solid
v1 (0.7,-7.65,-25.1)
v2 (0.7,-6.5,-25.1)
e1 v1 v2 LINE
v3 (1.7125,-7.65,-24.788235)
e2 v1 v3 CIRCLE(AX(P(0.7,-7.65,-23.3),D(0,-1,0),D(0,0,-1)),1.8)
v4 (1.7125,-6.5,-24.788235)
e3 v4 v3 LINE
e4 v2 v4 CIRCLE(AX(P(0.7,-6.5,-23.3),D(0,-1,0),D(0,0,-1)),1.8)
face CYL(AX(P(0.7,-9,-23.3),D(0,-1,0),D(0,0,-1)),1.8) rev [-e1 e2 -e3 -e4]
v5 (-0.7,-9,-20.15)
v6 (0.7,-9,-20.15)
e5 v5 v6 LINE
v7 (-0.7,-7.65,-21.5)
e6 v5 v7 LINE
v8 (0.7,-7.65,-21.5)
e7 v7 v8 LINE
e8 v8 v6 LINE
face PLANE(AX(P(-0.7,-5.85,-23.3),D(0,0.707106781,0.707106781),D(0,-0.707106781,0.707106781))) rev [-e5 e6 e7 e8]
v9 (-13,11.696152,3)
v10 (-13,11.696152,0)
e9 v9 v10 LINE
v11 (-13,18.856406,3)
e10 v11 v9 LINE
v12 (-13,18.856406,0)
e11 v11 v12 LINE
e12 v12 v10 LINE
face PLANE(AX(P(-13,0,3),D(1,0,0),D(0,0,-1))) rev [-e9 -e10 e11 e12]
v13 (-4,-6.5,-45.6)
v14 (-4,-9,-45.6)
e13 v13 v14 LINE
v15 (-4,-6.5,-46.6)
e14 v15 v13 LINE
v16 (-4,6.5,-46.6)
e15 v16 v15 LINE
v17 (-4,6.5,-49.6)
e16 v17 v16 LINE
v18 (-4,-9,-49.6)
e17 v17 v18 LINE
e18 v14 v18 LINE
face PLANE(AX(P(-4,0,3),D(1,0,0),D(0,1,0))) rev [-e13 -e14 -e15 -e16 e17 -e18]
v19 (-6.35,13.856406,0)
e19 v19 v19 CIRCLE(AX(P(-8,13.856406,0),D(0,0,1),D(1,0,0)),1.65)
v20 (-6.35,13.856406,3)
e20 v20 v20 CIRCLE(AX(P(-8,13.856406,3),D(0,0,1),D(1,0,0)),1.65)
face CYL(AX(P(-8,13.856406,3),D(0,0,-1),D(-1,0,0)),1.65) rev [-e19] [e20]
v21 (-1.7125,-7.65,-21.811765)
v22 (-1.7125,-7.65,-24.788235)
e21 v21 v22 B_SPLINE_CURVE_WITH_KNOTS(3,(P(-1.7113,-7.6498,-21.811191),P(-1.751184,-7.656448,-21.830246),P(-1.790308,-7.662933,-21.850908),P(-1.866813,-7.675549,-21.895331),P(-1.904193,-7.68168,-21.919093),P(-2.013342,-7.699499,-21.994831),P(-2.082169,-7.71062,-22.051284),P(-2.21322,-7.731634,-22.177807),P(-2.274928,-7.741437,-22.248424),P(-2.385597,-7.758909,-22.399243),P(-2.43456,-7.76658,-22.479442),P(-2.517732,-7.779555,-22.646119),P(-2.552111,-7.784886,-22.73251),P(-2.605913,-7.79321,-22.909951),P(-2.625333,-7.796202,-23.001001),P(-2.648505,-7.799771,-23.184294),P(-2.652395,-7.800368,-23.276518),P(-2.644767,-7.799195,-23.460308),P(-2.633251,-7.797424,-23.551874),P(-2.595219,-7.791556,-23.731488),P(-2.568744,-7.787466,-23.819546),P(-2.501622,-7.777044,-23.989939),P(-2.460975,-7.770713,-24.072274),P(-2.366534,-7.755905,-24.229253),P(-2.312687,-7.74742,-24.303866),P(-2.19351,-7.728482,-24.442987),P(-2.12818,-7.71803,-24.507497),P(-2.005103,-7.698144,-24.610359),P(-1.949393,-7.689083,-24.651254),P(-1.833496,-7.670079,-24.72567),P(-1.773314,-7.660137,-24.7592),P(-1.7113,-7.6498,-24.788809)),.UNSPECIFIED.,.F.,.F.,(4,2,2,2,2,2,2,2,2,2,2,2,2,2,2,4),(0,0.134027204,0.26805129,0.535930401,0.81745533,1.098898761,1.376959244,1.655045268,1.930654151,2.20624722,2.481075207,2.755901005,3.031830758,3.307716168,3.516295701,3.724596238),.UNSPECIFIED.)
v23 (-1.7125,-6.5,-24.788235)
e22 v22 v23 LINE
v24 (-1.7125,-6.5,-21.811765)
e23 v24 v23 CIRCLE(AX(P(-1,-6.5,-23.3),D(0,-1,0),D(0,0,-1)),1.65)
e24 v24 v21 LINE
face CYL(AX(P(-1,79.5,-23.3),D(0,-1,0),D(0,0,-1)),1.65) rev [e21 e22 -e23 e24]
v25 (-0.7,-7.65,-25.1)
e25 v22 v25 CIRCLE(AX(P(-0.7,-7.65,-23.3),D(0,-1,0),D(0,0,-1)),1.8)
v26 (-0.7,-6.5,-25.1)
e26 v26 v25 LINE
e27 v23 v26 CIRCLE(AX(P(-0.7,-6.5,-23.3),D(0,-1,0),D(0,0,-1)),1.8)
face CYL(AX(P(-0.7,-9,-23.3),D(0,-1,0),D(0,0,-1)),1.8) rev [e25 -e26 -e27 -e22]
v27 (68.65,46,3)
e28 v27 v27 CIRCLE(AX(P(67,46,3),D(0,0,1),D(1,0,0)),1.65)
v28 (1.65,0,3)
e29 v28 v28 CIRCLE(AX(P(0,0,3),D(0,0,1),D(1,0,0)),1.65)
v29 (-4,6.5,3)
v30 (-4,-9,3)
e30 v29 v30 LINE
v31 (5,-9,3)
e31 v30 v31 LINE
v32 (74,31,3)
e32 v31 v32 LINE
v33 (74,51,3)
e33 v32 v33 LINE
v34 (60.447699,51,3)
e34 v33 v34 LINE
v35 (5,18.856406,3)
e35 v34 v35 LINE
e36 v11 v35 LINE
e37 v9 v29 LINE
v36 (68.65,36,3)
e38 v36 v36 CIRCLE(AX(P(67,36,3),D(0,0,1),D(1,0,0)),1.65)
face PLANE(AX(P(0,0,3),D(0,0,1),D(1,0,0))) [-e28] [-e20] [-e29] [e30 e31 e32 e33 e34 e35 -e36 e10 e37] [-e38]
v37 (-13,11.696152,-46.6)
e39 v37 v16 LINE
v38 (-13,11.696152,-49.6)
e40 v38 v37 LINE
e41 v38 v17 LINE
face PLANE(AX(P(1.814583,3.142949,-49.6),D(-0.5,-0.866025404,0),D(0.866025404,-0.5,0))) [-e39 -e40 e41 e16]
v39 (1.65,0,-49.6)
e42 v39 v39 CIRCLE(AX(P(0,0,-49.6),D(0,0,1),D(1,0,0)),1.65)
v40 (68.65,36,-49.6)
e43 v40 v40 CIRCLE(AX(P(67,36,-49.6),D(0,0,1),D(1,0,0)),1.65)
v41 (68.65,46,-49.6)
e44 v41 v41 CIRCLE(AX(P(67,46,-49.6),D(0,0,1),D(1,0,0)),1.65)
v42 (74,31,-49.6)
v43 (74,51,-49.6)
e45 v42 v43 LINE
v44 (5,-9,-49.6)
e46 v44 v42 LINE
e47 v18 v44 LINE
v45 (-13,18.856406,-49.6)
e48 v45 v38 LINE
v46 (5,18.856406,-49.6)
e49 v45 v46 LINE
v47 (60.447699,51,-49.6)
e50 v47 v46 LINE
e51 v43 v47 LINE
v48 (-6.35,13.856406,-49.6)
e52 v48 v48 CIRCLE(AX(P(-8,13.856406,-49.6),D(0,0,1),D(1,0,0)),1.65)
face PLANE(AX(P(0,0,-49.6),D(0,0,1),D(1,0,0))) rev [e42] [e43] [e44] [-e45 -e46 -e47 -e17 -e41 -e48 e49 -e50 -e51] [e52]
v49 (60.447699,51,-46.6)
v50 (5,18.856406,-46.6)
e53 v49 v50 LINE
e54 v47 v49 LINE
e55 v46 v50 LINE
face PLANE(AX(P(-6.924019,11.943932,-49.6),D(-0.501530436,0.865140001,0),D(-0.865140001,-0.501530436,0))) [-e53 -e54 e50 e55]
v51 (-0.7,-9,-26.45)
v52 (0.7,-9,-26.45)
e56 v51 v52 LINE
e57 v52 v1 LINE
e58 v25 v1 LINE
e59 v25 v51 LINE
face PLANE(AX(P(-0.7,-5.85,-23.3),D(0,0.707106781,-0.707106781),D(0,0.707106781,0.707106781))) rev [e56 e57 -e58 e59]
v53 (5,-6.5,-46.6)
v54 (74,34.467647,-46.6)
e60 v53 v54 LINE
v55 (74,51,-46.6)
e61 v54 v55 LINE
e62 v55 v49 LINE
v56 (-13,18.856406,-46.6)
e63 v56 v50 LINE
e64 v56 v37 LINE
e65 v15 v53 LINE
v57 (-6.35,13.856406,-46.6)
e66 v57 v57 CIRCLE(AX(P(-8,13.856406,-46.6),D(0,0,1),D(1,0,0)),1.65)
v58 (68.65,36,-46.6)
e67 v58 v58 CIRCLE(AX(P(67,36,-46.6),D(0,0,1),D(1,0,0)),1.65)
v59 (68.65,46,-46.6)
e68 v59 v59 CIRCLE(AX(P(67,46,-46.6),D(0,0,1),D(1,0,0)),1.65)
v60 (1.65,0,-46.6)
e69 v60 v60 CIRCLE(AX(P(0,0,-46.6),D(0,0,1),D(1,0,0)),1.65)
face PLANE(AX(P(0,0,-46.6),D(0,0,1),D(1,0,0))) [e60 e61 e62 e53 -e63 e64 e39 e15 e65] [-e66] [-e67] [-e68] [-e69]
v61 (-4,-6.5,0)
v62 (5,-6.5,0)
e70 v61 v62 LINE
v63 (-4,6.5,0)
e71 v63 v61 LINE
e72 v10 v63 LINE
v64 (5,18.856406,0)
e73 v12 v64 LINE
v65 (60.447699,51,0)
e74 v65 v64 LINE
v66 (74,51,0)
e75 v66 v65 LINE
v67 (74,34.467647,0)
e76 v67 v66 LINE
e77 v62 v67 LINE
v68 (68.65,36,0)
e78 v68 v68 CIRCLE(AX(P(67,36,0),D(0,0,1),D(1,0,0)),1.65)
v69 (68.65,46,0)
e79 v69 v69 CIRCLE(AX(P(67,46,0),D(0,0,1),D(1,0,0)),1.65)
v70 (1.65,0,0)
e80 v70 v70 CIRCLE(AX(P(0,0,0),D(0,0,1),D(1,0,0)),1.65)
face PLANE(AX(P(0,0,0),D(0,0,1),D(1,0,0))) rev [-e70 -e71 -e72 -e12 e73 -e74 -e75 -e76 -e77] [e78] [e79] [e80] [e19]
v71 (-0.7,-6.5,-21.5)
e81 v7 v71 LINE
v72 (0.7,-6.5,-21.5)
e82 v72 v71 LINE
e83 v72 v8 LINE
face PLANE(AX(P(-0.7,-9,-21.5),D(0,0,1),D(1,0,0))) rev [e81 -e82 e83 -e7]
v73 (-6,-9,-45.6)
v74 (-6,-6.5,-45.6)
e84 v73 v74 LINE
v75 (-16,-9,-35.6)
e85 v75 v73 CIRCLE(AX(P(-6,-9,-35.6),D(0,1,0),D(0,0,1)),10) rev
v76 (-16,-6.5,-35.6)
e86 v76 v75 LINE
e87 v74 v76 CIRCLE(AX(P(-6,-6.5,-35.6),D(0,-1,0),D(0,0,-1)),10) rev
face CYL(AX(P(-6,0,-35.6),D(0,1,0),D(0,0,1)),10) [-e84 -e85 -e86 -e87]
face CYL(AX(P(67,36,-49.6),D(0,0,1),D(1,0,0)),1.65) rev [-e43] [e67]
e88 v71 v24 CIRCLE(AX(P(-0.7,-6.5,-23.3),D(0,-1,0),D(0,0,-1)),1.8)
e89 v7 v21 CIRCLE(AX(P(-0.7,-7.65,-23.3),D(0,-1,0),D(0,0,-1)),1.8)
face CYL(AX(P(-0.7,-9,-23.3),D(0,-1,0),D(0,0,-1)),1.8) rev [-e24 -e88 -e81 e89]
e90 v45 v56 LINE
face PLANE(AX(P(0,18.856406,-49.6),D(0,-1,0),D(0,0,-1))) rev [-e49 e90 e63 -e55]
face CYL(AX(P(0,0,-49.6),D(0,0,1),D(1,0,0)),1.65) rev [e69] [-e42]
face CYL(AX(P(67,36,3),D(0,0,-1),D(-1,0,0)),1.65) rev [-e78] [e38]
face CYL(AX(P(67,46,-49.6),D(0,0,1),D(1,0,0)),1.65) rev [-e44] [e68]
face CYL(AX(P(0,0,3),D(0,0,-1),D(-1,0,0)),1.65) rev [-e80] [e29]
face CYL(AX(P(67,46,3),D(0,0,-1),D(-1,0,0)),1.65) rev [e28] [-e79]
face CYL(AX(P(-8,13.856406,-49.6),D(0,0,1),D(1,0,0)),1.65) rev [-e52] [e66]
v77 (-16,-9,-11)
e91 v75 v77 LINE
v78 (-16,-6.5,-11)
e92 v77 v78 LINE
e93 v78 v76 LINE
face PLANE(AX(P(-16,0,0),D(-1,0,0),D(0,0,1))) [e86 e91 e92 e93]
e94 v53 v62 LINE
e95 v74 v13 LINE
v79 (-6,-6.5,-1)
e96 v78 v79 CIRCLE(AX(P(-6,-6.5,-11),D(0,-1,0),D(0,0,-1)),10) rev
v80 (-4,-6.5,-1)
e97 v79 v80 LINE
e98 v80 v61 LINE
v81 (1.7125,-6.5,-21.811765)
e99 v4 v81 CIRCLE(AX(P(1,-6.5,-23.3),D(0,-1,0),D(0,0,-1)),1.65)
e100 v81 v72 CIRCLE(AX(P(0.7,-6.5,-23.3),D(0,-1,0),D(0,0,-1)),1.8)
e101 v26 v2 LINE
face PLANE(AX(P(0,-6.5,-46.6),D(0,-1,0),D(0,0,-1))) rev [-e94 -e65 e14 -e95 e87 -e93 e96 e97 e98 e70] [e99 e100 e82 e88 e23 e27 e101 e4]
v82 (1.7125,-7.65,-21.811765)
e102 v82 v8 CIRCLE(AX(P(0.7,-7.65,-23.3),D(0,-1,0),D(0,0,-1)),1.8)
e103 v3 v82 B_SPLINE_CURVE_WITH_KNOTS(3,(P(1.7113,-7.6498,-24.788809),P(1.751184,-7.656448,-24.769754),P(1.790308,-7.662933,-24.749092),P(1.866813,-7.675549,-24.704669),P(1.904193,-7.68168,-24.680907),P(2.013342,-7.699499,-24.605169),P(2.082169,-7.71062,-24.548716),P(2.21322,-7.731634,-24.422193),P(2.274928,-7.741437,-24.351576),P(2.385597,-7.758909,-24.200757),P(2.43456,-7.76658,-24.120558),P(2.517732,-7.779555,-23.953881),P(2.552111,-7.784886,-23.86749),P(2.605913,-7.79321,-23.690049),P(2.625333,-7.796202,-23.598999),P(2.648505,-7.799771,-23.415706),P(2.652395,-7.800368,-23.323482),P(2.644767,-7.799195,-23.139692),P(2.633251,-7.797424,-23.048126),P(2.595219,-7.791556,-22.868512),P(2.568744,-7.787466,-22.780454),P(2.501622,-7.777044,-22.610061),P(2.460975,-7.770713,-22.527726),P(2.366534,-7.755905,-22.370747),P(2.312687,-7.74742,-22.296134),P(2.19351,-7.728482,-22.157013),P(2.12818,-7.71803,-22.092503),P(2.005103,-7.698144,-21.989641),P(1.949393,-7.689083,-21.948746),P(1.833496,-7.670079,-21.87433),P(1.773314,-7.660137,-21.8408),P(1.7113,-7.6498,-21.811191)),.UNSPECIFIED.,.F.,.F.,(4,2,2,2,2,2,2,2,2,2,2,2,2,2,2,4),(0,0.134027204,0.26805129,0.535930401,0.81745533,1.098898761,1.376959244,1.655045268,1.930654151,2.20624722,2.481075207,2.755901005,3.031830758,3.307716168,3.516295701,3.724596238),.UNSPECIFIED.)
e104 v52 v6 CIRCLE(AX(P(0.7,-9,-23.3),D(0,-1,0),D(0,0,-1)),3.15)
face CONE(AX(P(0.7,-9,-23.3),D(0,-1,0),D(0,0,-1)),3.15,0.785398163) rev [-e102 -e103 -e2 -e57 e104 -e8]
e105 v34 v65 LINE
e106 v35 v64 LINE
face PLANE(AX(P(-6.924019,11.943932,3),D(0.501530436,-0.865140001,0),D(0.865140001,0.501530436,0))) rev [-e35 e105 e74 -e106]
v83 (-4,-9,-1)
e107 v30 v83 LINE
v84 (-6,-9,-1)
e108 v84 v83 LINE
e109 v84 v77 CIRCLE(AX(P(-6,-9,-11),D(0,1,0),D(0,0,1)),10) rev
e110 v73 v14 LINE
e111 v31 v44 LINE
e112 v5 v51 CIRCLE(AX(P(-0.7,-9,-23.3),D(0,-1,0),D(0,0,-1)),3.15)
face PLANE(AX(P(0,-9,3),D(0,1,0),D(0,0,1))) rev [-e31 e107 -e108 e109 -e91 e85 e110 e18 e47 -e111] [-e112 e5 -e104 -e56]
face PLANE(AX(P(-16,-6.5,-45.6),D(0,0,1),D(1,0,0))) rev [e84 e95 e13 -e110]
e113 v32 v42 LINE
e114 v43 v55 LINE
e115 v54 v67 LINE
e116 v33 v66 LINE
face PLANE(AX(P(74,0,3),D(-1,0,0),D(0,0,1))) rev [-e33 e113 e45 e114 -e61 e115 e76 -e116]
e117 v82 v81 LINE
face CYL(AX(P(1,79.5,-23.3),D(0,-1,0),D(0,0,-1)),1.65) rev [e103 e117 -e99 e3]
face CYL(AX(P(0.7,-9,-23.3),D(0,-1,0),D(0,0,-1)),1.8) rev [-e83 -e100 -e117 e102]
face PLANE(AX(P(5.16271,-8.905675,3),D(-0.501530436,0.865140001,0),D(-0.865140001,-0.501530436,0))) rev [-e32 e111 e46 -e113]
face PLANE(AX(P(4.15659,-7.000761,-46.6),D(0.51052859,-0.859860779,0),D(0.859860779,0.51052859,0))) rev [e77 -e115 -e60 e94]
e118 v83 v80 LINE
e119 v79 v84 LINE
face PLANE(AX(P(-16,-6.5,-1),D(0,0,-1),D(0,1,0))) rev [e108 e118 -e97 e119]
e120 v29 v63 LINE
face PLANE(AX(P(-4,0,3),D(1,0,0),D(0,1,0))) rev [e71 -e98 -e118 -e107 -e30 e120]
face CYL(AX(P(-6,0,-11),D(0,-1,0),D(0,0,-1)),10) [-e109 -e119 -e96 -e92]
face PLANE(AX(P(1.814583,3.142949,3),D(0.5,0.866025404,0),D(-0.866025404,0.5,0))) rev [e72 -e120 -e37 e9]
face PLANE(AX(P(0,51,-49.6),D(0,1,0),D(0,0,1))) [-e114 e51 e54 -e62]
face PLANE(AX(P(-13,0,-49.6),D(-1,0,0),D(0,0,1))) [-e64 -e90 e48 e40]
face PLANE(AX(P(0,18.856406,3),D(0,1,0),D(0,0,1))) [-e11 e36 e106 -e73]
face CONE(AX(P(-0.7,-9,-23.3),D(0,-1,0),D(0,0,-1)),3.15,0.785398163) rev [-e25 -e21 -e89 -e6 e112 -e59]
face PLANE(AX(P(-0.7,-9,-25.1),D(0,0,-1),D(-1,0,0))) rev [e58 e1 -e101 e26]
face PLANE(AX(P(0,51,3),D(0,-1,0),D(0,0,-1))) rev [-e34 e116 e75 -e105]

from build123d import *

# Parameters (mm, degrees)
SKETCH1_R                                      = 1.65
BOSS_EXTRUDE1_DEPTH                            = 3
SKETCH1_3_W                                    = 9
SKETCH1_3_H                                    = 2.5
BOSS_EXTRUDE2_DEPTH                            = 46.6
BOSS_EXTRUDE3_START                            = -49.6
SKETCH1_4_R                                    = 1.65
SKETCH1_4_W                                    = 9
SKETCH1_4_H                                    = 2.5
BOSS_EXTRUDE3_DEPTH                            = 3
CUT_EXTRUDE1_DEPTH                             = 88.5
SKETCH3_W                                      = 44.6
SKETCH3_H                                      = 2.5
BOSS_EXTRUDE4_DEPTH                            = 12
FILLET1_R                                      = 10
CSK_START                                      = -9
CSK_SLOT_FOR_M3_COUNTERSUNK_FLAT_HEAD_SC_DEPTH = 3


with BuildPart() as part:
    # Sketch1 → Boss-Extrude1 (new body)
    with BuildSketch(Plane.XY):
        Polygon((-13, 18.856406461), (-13, 11.696152423), (-4, 6.5), (-4, -9), (5, -9), (74, 31), (74, 51), (60.447698856, 51), (5, 18.856406461), align=None)
        Circle(SKETCH1_R, mode=Mode.SUBTRACT)
        with Locations((-8, 13.856406461)):
            Circle(SKETCH1_R, mode=Mode.SUBTRACT)
        with Locations((67, 46)):
            Circle(SKETCH1_R, mode=Mode.SUBTRACT)
        with Locations((67, 36)):
            Circle(SKETCH1_R, mode=Mode.SUBTRACT)
    extrude(amount=BOSS_EXTRUDE1_DEPTH)

    # Sketch1<3> → Boss-Extrude2 (add)
    with BuildSketch(Plane.XY):
        with Locations((0.5, -7.75)):
            Rectangle(SKETCH1_3_W, SKETCH1_3_H)
        Polygon((74, 34.467646849), (5, -6.5), (5, -9), (74, 31), align=None)
    extrude(amount=-BOSS_EXTRUDE2_DEPTH)

    # Sketch1<4> → Boss-Extrude3 (add)
    # profile 1 of 4: a face of its own
    with BuildSketch(Plane.XY.offset(BOSS_EXTRUDE3_START)):
        Polygon((5, 18.856406461), (-13, 18.856406461), (-13, 11.696152423), (-4, 6.5), (-4, -6.5), (5, -6.5), align=None)
        Circle(SKETCH1_4_R, mode=Mode.SUBTRACT)
        with Locations((-8, 13.856406461)):
            Circle(SKETCH1_4_R, mode=Mode.SUBTRACT)
    # profile 2 of 4: a face of its own
    with BuildSketch(Plane.XY.offset(BOSS_EXTRUDE3_START)):
        with Locations((0.5, -7.75)):
            Rectangle(SKETCH1_4_W, SKETCH1_4_H)
    # profile 3 of 4: a face of its own
    with BuildSketch(Plane.XY.offset(BOSS_EXTRUDE3_START)):
        Polygon((74, 34.467646849), (5, -6.5), (5, -9), (74, 31), align=None)
    # profile 4 of 4: a face of its own
    with BuildSketch(Plane.XY.offset(BOSS_EXTRUDE3_START)):
        Polygon((60.447698856, 51), (5, 18.856406461), (5, -6.5), (74, 34.467646849), (74, 51), align=None)
        with Locations((67, 36)):
            Circle(SKETCH1_4_R, mode=Mode.SUBTRACT)
        with Locations((67, 46)):
            Circle(SKETCH1_4_R, mode=Mode.SUBTRACT)
    extrude(amount=BOSS_EXTRUDE3_DEPTH)

    # Sketch2 → Cut-Extrude1 (cut)
    with BuildSketch(Plane.XZ.offset(9)):
        with BuildLine():
            Line((1, -24.95), (-1, -24.95))
            ThreePointArc((-1, -24.95), (-2.65, -23.3), (-1, -21.65))
            Line((-1, -21.65), (1, -21.65))
            ThreePointArc((1, -21.65), (2.65, -23.3), (1, -24.95))
        make_face()
    extrude(amount=-CUT_EXTRUDE1_DEPTH, mode=Mode.SUBTRACT)

    # Sketch3 → Boss-Extrude4 (add)
    with BuildSketch(Plane.ZY.offset(4)):
        with Locations((-23.3, -7.75)):
            Rectangle(SKETCH3_W, SKETCH3_H)
    extrude(amount=BOSS_EXTRUDE4_DEPTH)

    # Fillet1
    fillet1_edges = [part.edges().sort_by_distance(p)[0] for p in [
        (-16, -7.75, -45.6),
        (-16, -7.75, -1),
    ]]
    fillet(fillet1_edges, radius=FILLET1_R)

    # CSK SLOT for M3 Countersunk Flat Head Screw1: read off the stored shape, not the designer's step
    # CSK SLOT for M3 Countersunk Flat Hea 2 → CSK SLOT for M3 Countersunk Flat Head Screw1 (cut)
    with BuildSketch(Plane(origin=(0, 0, 0), x_dir=(1, 0, 0), z_dir=(0, 1, 0)).offset(CSK_START)):
        with BuildLine():
            ThreePointArc((-1.7125, 21.811764888), (-1.229705955, 21.579705955), (-0.7, 21.5))
            Line((-0.7, 21.5), (0.7, 21.5))
            ThreePointArc((0.7, 21.5), (1.229705955, 21.579705955), (1.7125, 21.811764888))
            ThreePointArc((1.7125, 21.811764888), (1.365316345, 21.690949358), (1, 21.65))
            Line((1, 21.65), (-1, 21.65))
            ThreePointArc((-1, 21.65), (-1.365316345, 21.690949358), (-1.7125, 21.811764888))
        make_face()
        with BuildLine():
            ThreePointArc((-0.7, 25.1), (-1.229705955, 25.020294045), (-1.7125, 24.788235112))
            ThreePointArc((-1.7125, 24.788235112), (-1.365316345, 24.909050642), (-1, 24.95))
            Line((-1, 24.95), (1, 24.95))
            ThreePointArc((1, 24.95), (1.365316345, 24.909050642), (1.7125, 24.788235112))
            ThreePointArc((1.7125, 24.788235112), (1.229705955, 25.020294045), (0.7, 25.1))
            Line((0.7, 25.1), (-0.7, 25.1))
        make_face()
    extrude(amount=CSK_SLOT_FOR_M3_COUNTERSUNK_FLAT_HEAD_SC_DEPTH, mode=Mode.SUBTRACT)

    # CSK SLOT for M3 Countersunk Flat Hea 3: loft between two sections, ruled curve by curve
    csk_slot_for_m3_countersunk_flat_hea_3_from = [
        Edge.make_three_point_arc((0.7, -7.649999999, -25.099999999), (1.972792205, -7.649999999, -24.572792205), (2.499999999, -7.649999999, -23.3)),
        Edge.make_three_point_arc((2.499999999, -7.649999999, -23.3), (1.972792205, -7.649999999, -22.027207795), (0.7, -7.649999999, -21.500000001)),
        Edge.make_three_point_arc((-0.7, -7.649999999, -21.500000001), (-1.972792205, -7.649999999, -22.027207795), (-2.499999999, -7.649999999, -23.3)),
        Edge.make_three_point_arc((-2.499999999, -7.649999999, -23.3), (-1.972792205, -7.649999999, -24.572792205), (-0.7, -7.649999999, -25.099999999)),
        Edge.make_line((0.7, -7.649999999, -21.500000001), (-0.7, -7.649999999, -21.500000001)),
        Edge.make_line((0.7, -7.649999999, -25.099999999), (-0.7, -7.649999999, -25.099999999)),
    ]
    csk_slot_for_m3_countersunk_flat_hea_3_to = [
        Edge.make_three_point_arc((0.7, -9, -26.45), (2.927386361, -9, -25.527386361), (3.85, -9, -23.3)),
        Edge.make_three_point_arc((3.85, -9, -23.3), (2.927386361, -9, -21.072613639), (0.7, -9, -20.15)),
        Edge.make_three_point_arc((-0.7, -9, -20.15), (-2.927386361, -9, -21.072613639), (-3.85, -9, -23.3)),
        Edge.make_three_point_arc((-3.85, -9, -23.3), (-2.927386361, -9, -25.527386361), (-0.7, -9, -26.45)),
        Edge.make_line((0.7, -9, -20.15), (-0.7, -9, -20.15)),
        Edge.make_line((0.7, -9, -26.45), (-0.7, -9, -26.45)),
    ]
    csk_slot_for_m3_countersunk_flat_hea_3 = Solid(Shell([*[Face.make_surface_from_curves(csk_slot_for_m3_countersunk_flat_hea_3_from[k], csk_slot_for_m3_countersunk_flat_hea_3_to[k]) for k in range(6)], Face(Wire(csk_slot_for_m3_countersunk_flat_hea_3_from)), Face(Wire(csk_slot_for_m3_countersunk_flat_hea_3_to))]))
    add(csk_slot_for_m3_countersunk_flat_hea_3, mode=Mode.SUBTRACT)


solid = part.part
